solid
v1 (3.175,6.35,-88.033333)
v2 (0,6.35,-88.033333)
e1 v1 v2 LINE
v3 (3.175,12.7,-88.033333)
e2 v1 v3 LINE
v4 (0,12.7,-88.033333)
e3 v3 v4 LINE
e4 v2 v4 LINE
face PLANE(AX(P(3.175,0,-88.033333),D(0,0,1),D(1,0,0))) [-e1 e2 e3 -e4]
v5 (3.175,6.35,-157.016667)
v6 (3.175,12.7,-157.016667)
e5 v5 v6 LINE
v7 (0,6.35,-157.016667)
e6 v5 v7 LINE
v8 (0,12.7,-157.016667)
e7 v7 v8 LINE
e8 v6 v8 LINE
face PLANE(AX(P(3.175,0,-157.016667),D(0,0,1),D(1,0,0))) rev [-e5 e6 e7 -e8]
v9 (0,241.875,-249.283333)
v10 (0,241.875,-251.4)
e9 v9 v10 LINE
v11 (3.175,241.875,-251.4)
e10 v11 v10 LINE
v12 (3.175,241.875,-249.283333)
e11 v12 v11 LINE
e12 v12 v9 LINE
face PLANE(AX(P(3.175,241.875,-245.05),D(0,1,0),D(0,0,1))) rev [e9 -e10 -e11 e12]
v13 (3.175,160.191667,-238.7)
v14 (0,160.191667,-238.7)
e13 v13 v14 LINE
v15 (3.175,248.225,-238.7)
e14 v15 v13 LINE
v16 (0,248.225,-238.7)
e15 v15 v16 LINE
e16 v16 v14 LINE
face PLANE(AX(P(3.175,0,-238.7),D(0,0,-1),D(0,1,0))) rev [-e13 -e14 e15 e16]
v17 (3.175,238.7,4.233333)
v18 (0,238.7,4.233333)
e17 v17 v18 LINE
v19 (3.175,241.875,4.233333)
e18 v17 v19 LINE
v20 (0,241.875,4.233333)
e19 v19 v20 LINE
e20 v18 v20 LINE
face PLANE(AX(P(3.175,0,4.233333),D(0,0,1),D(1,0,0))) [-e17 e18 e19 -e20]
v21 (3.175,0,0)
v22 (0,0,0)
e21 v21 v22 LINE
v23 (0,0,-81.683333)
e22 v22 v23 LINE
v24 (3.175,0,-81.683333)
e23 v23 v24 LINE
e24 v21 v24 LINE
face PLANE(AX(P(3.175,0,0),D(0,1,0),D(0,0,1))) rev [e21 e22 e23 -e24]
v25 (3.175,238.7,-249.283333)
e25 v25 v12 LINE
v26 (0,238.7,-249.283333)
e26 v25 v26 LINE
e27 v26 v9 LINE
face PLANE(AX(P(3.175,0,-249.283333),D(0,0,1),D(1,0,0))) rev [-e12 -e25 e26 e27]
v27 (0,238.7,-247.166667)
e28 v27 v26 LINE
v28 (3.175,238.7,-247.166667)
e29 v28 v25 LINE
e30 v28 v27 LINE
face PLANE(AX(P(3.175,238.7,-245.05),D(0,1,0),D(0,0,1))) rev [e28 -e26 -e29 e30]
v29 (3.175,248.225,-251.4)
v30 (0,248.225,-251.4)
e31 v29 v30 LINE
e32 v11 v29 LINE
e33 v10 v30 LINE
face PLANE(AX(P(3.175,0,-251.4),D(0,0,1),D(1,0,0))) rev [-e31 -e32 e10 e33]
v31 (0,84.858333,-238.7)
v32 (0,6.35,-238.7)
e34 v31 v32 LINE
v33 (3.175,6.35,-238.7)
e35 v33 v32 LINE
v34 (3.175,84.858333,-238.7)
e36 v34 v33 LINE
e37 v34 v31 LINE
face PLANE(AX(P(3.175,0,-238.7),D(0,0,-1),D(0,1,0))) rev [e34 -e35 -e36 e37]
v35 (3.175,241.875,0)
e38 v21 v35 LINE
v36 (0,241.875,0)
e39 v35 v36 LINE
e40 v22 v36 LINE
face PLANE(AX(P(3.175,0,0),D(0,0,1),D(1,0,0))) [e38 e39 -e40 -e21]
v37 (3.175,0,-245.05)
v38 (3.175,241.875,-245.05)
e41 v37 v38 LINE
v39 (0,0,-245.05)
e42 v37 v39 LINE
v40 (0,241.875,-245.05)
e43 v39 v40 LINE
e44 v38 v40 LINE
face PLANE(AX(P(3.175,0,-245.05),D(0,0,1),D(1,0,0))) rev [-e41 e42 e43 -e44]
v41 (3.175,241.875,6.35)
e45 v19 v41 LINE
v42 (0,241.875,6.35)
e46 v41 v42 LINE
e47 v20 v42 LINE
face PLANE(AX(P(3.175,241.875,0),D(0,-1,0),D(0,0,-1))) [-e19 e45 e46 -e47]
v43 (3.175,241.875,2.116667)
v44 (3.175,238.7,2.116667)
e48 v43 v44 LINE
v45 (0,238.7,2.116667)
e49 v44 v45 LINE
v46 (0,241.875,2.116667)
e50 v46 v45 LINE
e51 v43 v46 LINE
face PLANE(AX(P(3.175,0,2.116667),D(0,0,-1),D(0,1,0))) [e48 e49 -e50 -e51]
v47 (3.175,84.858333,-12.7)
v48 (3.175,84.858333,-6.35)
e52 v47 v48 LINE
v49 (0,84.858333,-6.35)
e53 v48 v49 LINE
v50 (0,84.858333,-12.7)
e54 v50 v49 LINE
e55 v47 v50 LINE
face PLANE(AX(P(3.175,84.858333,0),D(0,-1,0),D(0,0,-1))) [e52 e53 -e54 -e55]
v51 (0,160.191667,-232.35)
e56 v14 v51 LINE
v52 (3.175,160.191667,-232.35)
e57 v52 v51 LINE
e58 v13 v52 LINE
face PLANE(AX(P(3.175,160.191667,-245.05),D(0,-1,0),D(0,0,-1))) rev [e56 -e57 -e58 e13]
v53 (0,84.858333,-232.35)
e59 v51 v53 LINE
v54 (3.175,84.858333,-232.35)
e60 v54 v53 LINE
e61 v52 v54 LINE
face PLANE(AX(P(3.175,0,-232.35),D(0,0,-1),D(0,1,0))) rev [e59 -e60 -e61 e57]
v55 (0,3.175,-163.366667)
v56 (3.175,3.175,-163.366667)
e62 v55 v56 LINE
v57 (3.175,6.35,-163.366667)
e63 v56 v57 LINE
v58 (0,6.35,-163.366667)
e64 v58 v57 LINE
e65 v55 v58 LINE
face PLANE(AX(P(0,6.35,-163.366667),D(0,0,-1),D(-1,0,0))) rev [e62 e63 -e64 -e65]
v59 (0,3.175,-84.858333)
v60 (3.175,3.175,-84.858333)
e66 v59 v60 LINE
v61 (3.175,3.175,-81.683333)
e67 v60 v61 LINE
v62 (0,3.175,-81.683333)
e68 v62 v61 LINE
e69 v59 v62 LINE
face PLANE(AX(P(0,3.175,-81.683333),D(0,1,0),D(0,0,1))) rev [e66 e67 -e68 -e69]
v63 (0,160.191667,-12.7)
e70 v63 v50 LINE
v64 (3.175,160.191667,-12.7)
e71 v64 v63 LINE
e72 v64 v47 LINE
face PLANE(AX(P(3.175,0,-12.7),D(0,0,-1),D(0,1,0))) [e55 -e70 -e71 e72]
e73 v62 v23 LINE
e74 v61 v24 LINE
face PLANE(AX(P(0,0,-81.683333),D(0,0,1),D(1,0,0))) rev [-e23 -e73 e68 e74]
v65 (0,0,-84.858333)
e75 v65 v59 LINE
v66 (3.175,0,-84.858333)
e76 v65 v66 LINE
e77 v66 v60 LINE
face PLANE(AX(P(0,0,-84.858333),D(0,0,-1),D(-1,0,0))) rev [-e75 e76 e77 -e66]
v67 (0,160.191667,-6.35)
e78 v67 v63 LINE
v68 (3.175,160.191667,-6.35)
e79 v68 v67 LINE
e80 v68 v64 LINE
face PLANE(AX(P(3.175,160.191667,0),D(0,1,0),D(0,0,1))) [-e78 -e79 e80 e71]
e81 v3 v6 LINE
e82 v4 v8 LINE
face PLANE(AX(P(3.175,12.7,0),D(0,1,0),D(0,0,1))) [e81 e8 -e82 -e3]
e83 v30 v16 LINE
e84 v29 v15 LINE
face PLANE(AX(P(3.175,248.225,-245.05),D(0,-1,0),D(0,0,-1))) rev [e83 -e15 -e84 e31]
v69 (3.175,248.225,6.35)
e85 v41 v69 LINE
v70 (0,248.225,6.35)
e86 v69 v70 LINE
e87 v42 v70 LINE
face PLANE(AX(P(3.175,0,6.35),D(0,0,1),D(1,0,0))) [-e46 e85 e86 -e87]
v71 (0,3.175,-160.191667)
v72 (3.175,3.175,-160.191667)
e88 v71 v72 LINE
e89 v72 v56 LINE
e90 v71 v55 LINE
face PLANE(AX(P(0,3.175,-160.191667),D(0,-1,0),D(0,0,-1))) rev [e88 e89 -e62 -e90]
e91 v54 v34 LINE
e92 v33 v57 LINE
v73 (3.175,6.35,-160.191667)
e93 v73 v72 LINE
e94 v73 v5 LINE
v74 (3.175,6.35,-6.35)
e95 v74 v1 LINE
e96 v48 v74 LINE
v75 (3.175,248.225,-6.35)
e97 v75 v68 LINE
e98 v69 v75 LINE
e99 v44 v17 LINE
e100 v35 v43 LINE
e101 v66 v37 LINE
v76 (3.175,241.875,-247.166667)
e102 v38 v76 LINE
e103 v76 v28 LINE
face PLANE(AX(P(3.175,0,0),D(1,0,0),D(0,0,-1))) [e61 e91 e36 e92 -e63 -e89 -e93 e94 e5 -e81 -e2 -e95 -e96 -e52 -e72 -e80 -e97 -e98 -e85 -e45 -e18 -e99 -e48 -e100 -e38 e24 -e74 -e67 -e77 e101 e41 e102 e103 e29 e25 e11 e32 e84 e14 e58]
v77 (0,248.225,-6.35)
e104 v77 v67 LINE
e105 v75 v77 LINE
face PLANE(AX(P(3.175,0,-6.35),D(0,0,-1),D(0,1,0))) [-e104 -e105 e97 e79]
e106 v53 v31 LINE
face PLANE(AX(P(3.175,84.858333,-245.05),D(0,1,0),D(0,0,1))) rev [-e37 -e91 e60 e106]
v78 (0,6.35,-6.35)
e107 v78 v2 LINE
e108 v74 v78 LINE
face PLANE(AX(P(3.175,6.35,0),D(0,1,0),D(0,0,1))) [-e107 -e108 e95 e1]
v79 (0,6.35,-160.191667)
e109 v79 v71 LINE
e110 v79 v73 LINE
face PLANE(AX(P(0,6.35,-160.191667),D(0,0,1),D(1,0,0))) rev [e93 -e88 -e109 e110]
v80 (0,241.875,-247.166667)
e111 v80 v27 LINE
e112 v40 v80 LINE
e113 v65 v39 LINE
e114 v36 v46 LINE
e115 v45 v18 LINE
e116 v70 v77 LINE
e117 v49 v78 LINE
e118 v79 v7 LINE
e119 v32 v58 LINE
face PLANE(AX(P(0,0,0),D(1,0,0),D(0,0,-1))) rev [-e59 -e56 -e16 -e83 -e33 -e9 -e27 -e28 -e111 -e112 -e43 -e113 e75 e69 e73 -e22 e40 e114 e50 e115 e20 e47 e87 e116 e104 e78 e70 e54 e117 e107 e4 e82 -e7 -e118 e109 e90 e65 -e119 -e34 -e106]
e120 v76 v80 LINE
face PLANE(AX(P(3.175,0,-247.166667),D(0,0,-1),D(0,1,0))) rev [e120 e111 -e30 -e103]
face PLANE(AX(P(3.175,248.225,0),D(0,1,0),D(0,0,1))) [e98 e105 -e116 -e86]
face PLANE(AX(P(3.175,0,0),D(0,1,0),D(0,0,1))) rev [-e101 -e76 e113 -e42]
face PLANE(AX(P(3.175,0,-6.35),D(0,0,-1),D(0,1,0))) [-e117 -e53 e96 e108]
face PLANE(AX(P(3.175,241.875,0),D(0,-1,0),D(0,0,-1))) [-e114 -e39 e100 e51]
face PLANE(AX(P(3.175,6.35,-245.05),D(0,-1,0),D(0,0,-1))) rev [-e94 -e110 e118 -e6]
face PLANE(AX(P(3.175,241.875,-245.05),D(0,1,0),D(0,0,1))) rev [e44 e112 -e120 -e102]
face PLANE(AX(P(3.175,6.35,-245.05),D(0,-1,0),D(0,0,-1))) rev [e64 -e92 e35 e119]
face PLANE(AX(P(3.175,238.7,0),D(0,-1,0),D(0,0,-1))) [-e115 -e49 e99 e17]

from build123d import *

# Parameters (mm, degrees)
BOSS_EXTRUDE1_DEPTH = 3.175
MIRROR1_OUTLINE_W   = 3.175
MIRROR1_OUTLINE_H   = 6.35
MIRROR1_DEPTH       = 248.225
MIRROR1_2_OUTLINE_W = 3.175
MIRROR1_2_OUTLINE_H = 116.175
MIRROR1_2_DEPTH     = 6.35
MIRROR1_START       = 84.858333333
MIRROR1_3_OUTLINE_W = 3.175
MIRROR1_3_OUTLINE_H = 6.35
MIRROR1_3_DEPTH     = 75.333333334
MIRROR1_START_2     = 6.35
MIRROR1_4_OUTLINE_W = 3.175
MIRROR1_4_OUTLINE_H = 34.491666667
MIRROR1_4_DEPTH     = 6.35
MIRROR1_START_3     = 241.875
MIRROR1_5_OUTLINE_W = 3.175
MIRROR1_5_OUTLINE_H = 6.35
MIRROR1_5_DEPTH     = 6.35
MIRROR1_START_4     = 238.7
MIRROR1_6_OUTLINE_W = 3.175
MIRROR1_6_OUTLINE_H = 2.116666666
MIRROR1_6_DEPTH     = 3.175
SKETCH2_W           = 3.175
SKETCH2_H           = 3.175
CUT_EXTRUDE1_DEPTH  = 3.175


# Read off the part's stored shape, not the designer's step: Mirror1
with BuildPart() as part:
    # Sketch1 → Boss-Extrude1 (new body)
    with BuildSketch(Plane(origin=(0, 0, 0), x_dir=(0, 0, -1), z_dir=(1, 0, 0))):
        Polygon((6.35, 232.35), (0, 232.35), (0, 0), (122.525, 0), (122.525, 12.7), (88.033333333, 12.7), (88.033333333, 6.35), (6.35, 6.35), (6.35, 84.858333333), (12.7, 84.858333333), (12.7, 160.191666667), (6.35, 160.191666667), align=None)
        Polygon((-2.116666667, 241.875), (0, 241.875), (0, 232.35), (6.35, 232.35), (6.35, 248.225), (-6.35, 248.225), (-6.35, 241.875), (-4.233333333, 241.875), (-4.233333333, 238.7), (-2.116666667, 238.7), align=None)
    extrude(amount=BOSS_EXTRUDE1_DEPTH)



with BuildPart() as body_2:
    # Mirror1 outline → Mirror1 (new body)
    with BuildSketch(Plane(origin=(0, 0, 0), x_dir=(1, 0, 0), z_dir=(0, 1, 0))):
        with Locations((1.5875, 241.875)):
            Rectangle(MIRROR1_OUTLINE_W, MIRROR1_OUTLINE_H)
    extrude(amount=MIRROR1_DEPTH)


with BuildPart() as part_1:
    add(part.part)

    add(body_2.part)  # Mirror1 2 merges body 2
    # Mirror1 2 outline → Mirror1 2 (add)
    with BuildSketch(Plane(origin=(0, 0, 0), x_dir=(1, 0, 0), z_dir=(0, 1, 0))):
        with Locations((1.5875, 180.6125)):
            Rectangle(MIRROR1_2_OUTLINE_W, MIRROR1_2_OUTLINE_H)
    extrude(amount=MIRROR1_2_DEPTH)

    # Mirror1 3 outline → Mirror1 3 (add)
    with BuildSketch(Plane(origin=(0, 0, 0), x_dir=(1, 0, 0), z_dir=(0, 1, 0)).offset(MIRROR1_START)):
        with Locations((1.5875, 235.525)):
            Rectangle(MIRROR1_3_OUTLINE_W, MIRROR1_3_OUTLINE_H)
    extrude(amount=MIRROR1_3_DEPTH)

    # Mirror1 4 outline → Mirror1 4 (add)
    with BuildSketch(Plane(origin=(0, 0, 0), x_dir=(1, 0, 0), z_dir=(0, 1, 0)).offset(MIRROR1_START_2)):
        with Locations((1.5875, 139.770833334)):
            Rectangle(MIRROR1_4_OUTLINE_W, MIRROR1_4_OUTLINE_H)
    extrude(amount=MIRROR1_4_DEPTH)

    # Mirror1 5 outline → Mirror1 5 (add)
    with BuildSketch(Plane(origin=(0, 0, 0), x_dir=(1, 0, 0), z_dir=(0, 1, 0)).offset(MIRROR1_START_3)):
        with Locations((1.5875, 248.225)):
            Rectangle(MIRROR1_5_OUTLINE_W, MIRROR1_5_OUTLINE_H)
    extrude(amount=MIRROR1_5_DEPTH)

    # Mirror1 6 outline → Mirror1 6 (add)
    with BuildSketch(Plane(origin=(0, 0, 0), x_dir=(1, 0, 0), z_dir=(0, 1, 0)).offset(MIRROR1_START_4)):
        with Locations((1.5875, 248.225)):
            Rectangle(MIRROR1_6_OUTLINE_W, MIRROR1_6_OUTLINE_H)
    extrude(amount=MIRROR1_6_DEPTH)

    # Sketch2 → Cut-Extrude1 (cut)
    with BuildSketch(Plane(origin=(3.175, 0, 0), x_dir=(0, 0, -1), z_dir=(1, 0, 0))):
        with Locations((83.270833333, 1.5875)):
            Rectangle(SKETCH2_W, SKETCH2_H)
        with Locations((161.779166667, 4.7625)):
            Rectangle(SKETCH2_W, SKETCH2_H)
    extrude(amount=-CUT_EXTRUDE1_DEPTH, mode=Mode.SUBTRACT)


solid = part_1.part
